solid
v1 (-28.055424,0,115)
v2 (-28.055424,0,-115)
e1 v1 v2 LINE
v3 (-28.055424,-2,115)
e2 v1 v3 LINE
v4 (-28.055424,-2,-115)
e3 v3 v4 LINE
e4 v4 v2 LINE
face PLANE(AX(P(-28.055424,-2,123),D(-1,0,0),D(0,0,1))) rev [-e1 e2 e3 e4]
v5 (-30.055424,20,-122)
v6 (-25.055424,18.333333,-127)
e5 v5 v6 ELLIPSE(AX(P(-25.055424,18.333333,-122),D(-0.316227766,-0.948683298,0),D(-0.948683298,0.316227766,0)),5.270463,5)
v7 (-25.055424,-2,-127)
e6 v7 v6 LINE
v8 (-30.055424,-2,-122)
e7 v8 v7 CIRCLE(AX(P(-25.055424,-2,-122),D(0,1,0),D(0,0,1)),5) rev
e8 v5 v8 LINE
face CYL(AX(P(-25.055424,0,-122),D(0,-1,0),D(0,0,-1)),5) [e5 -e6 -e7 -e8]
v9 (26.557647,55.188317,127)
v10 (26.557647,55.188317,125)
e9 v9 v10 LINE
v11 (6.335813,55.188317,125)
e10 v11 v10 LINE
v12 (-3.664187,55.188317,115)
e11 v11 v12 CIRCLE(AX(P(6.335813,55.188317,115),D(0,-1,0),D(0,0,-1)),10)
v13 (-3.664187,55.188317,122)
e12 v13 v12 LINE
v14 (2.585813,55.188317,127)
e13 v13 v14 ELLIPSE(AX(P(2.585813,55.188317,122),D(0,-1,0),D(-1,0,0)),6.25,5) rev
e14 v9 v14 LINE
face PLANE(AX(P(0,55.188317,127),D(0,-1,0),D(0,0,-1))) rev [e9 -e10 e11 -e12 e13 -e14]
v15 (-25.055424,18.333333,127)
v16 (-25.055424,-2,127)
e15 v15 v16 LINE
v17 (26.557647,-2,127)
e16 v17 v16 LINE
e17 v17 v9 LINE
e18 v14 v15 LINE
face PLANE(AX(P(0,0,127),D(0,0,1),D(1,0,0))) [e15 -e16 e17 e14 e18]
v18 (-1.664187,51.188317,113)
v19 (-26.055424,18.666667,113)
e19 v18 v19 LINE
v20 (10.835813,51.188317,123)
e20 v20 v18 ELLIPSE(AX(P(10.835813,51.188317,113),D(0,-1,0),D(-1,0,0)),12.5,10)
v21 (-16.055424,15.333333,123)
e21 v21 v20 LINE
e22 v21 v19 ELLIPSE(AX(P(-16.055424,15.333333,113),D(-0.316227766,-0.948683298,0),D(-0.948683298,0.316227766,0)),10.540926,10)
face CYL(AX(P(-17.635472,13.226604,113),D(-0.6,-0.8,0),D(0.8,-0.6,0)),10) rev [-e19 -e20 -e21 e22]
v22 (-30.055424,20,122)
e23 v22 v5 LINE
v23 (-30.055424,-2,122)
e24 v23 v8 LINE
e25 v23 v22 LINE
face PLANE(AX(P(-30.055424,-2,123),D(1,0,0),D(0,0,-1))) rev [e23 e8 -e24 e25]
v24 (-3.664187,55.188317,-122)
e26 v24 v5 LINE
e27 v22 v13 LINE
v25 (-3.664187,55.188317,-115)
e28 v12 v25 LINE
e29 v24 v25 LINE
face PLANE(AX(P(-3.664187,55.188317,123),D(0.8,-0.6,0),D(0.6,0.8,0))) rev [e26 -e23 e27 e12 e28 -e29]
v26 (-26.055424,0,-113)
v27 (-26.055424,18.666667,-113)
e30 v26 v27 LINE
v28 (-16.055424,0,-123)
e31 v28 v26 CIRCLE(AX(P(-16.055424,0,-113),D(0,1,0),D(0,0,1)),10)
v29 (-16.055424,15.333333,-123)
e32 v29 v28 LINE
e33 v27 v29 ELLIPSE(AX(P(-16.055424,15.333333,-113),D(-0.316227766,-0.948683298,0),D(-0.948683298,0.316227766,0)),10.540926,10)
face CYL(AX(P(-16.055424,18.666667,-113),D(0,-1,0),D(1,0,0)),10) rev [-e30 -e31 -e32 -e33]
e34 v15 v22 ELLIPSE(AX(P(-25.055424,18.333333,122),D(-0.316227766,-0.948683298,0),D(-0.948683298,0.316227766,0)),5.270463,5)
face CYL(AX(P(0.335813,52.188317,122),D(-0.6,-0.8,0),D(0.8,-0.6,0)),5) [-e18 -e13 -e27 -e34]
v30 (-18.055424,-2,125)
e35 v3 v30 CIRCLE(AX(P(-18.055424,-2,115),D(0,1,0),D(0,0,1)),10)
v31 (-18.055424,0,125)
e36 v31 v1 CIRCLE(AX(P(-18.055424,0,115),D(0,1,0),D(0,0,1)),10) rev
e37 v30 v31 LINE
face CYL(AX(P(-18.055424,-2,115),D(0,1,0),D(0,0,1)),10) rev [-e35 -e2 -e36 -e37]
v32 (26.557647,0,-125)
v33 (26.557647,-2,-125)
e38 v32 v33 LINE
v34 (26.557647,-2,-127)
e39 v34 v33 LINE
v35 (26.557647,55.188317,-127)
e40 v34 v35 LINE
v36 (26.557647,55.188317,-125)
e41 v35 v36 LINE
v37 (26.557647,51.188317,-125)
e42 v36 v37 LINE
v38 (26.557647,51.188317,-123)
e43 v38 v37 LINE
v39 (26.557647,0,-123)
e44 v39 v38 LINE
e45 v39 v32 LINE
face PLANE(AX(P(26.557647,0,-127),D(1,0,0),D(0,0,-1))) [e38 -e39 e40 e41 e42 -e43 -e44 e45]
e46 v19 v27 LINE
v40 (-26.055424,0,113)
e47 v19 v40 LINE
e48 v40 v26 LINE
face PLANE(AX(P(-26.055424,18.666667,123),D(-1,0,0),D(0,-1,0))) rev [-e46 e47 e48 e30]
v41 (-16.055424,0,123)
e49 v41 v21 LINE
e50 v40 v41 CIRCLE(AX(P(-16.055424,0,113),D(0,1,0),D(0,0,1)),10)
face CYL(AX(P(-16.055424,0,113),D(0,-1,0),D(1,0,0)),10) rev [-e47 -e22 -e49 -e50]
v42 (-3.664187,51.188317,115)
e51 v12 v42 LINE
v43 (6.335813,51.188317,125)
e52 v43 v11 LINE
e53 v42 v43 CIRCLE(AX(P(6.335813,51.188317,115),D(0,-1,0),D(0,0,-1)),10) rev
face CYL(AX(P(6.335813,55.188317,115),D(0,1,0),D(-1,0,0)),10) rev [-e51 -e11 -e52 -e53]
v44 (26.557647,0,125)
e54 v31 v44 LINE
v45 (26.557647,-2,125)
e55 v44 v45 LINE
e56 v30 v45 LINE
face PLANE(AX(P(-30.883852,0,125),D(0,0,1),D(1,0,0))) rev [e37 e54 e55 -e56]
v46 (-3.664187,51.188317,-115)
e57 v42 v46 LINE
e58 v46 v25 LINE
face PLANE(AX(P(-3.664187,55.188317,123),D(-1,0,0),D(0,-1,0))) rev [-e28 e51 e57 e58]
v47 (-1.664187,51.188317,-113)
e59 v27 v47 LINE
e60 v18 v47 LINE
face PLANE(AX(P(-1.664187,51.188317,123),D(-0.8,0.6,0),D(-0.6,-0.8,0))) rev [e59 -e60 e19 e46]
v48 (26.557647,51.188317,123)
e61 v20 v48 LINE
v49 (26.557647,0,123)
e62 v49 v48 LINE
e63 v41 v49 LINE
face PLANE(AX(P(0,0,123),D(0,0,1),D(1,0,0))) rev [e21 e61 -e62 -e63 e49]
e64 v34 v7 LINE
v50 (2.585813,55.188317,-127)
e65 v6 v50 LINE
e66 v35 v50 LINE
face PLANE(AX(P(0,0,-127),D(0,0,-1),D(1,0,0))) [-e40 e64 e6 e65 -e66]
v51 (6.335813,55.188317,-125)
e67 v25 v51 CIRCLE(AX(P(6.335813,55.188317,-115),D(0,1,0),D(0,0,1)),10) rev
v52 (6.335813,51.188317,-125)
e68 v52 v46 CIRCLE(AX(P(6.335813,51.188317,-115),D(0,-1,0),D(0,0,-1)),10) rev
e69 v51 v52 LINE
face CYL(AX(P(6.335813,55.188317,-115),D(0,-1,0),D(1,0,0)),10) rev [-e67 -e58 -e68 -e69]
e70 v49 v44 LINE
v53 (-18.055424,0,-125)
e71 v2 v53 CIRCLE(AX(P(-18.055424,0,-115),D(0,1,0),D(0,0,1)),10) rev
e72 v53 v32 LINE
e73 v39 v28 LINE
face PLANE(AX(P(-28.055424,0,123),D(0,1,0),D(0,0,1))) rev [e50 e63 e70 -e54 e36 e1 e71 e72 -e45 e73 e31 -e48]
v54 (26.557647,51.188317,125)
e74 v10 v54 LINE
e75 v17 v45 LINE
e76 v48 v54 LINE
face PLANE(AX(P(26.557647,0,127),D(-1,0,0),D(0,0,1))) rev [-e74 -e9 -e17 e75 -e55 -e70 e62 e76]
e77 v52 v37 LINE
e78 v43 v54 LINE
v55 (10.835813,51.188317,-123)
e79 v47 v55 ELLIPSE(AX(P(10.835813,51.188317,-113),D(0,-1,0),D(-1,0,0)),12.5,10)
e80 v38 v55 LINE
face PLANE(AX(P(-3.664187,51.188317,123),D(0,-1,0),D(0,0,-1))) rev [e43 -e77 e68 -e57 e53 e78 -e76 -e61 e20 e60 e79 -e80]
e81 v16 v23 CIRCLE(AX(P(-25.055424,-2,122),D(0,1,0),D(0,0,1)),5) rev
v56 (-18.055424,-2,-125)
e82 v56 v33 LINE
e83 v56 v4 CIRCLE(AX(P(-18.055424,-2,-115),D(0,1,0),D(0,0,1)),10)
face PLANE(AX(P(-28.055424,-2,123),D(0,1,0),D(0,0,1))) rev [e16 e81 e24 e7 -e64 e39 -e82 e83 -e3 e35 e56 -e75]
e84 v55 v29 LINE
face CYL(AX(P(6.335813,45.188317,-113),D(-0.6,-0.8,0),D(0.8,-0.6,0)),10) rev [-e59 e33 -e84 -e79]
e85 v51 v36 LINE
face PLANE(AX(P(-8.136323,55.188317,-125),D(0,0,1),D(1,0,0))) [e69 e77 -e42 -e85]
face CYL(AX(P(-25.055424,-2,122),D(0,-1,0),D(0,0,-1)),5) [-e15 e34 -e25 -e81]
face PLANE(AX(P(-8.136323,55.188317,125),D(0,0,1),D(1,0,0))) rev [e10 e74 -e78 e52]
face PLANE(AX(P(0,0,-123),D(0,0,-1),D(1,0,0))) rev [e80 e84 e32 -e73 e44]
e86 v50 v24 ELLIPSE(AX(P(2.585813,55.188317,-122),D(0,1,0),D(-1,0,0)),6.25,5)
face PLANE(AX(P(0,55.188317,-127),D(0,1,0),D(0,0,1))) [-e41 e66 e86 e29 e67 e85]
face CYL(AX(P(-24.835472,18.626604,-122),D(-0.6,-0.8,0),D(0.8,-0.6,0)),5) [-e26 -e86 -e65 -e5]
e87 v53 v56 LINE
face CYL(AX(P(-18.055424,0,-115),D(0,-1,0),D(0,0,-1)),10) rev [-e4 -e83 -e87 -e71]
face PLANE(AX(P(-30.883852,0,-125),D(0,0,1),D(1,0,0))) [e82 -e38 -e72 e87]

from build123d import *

# Parameters (mm, degrees)
SALIENTE_EXTRUIR1_DEPTH = 123
SALIENTE_EXTRUIR2_DEPTH = 4
CROQUIS3_W              = 2
CROQUIS3_H              = 4
CORTAR_EXTRUIR1_DEPTH   = 30.221833509
CROQUIS3_3_W            = 2
CROQUIS3_3_H            = 2
CORTAR_EXTRUIR2_DEPTH   = 54.613071269
REDONDEO2_R             = 10
REDONDEO3_R             = 5


# Read off the part's stored shape, not the designer's step: Simetría1
with BuildPart() as part:
    # Croquis1 → Saliente-Extruir1 (new, symmetric)
    with BuildSketch(Plane.XY):
        Polygon((-30.055424469, 20), (-30.055424469, 0), (-30.055424469, -2), (-28.055424469, -2), (-28.055424469, 0), (-26.055424469, 0), (-26.055424469, 18.666666667), (-1.66418671, 51.188317013), (-3.66418671, 51.188317013), (-3.66418671, 55.188317013), align=None)
    extrude(amount=SALIENTE_EXTRUIR1_DEPTH, both=True)

    # Croquis2 → Saliente-Extruir2 (add)
    with BuildSketch(Plane.XY.offset(123)):
        Polygon((26.5576468, 13.444650029), (26.5576468, 18.666666667), (26.5576468, 55.188317013), (-3.66418671, 55.188317013), (-30.055424469, 20), (-30.055424469, 14.33808094), (-30.055424469, -2), (26.5576468, -2), align=None)
    extrude(amount=SALIENTE_EXTRUIR2_DEPTH)

    # Croquis3 → Cortar-Extruir1 (cut)
    with BuildSketch(Plane(origin=(26.5576468, 0, 0), x_dir=(0, 0, -1), z_dir=(1, 0, 0))):
        with Locations((-124, 53.188317013)):
            Rectangle(CROQUIS3_W, CROQUIS3_H)
    extrude(amount=-CORTAR_EXTRUIR1_DEPTH, mode=Mode.SUBTRACT)

    # Croquis3<3> → Cortar-Extruir2 (cut)
    with BuildSketch(Plane(origin=(26.5576468, 0, 0), x_dir=(0, 0, -1), z_dir=(1, 0, 0))):
        with Locations((-124, -1)):
            Rectangle(CROQUIS3_3_W, CROQUIS3_3_H)
    extrude(amount=-CORTAR_EXTRUIR2_DEPTH, mode=Mode.SUBTRACT)

    # Redondeo2
    redondeo2_edges = [part.edges().sort_by_distance(p)[0] for p in [
        (-26.055424469, 9.333333333, 123),
        (-3.664186709, 53.188317013, 125),
        (-28.055424469, -1, 125),
        (-13.85980559, 34.92749184, 123),
    ]]
    fillet(redondeo2_edges, radius=REDONDEO2_R)

    # Redondeo3
    redondeo3_edges = [part.edges().sort_by_distance(p)[0] for p in [
        (-16.85980559, 37.594158506, 127),
        (-30.055424469, 9, 127),
    ]]
    fillet(redondeo3_edges, radius=REDONDEO3_R)

    # Simetría1
    split(bisect_by=Plane(origin=(0, 0, 0), x_dir=(1, 0, 0), z_dir=(0, 0, -1)), keep=Keep.BOTTOM)

    # Simetr_a1 2: part across plane


with BuildPart() as part_1:
    add(part.part)
    add(part.part.mirror(Plane(origin=(0, 0, 0), x_dir=(1, 0, 0), z_dir=(0, 0, -1))))


solid = part_1.part
